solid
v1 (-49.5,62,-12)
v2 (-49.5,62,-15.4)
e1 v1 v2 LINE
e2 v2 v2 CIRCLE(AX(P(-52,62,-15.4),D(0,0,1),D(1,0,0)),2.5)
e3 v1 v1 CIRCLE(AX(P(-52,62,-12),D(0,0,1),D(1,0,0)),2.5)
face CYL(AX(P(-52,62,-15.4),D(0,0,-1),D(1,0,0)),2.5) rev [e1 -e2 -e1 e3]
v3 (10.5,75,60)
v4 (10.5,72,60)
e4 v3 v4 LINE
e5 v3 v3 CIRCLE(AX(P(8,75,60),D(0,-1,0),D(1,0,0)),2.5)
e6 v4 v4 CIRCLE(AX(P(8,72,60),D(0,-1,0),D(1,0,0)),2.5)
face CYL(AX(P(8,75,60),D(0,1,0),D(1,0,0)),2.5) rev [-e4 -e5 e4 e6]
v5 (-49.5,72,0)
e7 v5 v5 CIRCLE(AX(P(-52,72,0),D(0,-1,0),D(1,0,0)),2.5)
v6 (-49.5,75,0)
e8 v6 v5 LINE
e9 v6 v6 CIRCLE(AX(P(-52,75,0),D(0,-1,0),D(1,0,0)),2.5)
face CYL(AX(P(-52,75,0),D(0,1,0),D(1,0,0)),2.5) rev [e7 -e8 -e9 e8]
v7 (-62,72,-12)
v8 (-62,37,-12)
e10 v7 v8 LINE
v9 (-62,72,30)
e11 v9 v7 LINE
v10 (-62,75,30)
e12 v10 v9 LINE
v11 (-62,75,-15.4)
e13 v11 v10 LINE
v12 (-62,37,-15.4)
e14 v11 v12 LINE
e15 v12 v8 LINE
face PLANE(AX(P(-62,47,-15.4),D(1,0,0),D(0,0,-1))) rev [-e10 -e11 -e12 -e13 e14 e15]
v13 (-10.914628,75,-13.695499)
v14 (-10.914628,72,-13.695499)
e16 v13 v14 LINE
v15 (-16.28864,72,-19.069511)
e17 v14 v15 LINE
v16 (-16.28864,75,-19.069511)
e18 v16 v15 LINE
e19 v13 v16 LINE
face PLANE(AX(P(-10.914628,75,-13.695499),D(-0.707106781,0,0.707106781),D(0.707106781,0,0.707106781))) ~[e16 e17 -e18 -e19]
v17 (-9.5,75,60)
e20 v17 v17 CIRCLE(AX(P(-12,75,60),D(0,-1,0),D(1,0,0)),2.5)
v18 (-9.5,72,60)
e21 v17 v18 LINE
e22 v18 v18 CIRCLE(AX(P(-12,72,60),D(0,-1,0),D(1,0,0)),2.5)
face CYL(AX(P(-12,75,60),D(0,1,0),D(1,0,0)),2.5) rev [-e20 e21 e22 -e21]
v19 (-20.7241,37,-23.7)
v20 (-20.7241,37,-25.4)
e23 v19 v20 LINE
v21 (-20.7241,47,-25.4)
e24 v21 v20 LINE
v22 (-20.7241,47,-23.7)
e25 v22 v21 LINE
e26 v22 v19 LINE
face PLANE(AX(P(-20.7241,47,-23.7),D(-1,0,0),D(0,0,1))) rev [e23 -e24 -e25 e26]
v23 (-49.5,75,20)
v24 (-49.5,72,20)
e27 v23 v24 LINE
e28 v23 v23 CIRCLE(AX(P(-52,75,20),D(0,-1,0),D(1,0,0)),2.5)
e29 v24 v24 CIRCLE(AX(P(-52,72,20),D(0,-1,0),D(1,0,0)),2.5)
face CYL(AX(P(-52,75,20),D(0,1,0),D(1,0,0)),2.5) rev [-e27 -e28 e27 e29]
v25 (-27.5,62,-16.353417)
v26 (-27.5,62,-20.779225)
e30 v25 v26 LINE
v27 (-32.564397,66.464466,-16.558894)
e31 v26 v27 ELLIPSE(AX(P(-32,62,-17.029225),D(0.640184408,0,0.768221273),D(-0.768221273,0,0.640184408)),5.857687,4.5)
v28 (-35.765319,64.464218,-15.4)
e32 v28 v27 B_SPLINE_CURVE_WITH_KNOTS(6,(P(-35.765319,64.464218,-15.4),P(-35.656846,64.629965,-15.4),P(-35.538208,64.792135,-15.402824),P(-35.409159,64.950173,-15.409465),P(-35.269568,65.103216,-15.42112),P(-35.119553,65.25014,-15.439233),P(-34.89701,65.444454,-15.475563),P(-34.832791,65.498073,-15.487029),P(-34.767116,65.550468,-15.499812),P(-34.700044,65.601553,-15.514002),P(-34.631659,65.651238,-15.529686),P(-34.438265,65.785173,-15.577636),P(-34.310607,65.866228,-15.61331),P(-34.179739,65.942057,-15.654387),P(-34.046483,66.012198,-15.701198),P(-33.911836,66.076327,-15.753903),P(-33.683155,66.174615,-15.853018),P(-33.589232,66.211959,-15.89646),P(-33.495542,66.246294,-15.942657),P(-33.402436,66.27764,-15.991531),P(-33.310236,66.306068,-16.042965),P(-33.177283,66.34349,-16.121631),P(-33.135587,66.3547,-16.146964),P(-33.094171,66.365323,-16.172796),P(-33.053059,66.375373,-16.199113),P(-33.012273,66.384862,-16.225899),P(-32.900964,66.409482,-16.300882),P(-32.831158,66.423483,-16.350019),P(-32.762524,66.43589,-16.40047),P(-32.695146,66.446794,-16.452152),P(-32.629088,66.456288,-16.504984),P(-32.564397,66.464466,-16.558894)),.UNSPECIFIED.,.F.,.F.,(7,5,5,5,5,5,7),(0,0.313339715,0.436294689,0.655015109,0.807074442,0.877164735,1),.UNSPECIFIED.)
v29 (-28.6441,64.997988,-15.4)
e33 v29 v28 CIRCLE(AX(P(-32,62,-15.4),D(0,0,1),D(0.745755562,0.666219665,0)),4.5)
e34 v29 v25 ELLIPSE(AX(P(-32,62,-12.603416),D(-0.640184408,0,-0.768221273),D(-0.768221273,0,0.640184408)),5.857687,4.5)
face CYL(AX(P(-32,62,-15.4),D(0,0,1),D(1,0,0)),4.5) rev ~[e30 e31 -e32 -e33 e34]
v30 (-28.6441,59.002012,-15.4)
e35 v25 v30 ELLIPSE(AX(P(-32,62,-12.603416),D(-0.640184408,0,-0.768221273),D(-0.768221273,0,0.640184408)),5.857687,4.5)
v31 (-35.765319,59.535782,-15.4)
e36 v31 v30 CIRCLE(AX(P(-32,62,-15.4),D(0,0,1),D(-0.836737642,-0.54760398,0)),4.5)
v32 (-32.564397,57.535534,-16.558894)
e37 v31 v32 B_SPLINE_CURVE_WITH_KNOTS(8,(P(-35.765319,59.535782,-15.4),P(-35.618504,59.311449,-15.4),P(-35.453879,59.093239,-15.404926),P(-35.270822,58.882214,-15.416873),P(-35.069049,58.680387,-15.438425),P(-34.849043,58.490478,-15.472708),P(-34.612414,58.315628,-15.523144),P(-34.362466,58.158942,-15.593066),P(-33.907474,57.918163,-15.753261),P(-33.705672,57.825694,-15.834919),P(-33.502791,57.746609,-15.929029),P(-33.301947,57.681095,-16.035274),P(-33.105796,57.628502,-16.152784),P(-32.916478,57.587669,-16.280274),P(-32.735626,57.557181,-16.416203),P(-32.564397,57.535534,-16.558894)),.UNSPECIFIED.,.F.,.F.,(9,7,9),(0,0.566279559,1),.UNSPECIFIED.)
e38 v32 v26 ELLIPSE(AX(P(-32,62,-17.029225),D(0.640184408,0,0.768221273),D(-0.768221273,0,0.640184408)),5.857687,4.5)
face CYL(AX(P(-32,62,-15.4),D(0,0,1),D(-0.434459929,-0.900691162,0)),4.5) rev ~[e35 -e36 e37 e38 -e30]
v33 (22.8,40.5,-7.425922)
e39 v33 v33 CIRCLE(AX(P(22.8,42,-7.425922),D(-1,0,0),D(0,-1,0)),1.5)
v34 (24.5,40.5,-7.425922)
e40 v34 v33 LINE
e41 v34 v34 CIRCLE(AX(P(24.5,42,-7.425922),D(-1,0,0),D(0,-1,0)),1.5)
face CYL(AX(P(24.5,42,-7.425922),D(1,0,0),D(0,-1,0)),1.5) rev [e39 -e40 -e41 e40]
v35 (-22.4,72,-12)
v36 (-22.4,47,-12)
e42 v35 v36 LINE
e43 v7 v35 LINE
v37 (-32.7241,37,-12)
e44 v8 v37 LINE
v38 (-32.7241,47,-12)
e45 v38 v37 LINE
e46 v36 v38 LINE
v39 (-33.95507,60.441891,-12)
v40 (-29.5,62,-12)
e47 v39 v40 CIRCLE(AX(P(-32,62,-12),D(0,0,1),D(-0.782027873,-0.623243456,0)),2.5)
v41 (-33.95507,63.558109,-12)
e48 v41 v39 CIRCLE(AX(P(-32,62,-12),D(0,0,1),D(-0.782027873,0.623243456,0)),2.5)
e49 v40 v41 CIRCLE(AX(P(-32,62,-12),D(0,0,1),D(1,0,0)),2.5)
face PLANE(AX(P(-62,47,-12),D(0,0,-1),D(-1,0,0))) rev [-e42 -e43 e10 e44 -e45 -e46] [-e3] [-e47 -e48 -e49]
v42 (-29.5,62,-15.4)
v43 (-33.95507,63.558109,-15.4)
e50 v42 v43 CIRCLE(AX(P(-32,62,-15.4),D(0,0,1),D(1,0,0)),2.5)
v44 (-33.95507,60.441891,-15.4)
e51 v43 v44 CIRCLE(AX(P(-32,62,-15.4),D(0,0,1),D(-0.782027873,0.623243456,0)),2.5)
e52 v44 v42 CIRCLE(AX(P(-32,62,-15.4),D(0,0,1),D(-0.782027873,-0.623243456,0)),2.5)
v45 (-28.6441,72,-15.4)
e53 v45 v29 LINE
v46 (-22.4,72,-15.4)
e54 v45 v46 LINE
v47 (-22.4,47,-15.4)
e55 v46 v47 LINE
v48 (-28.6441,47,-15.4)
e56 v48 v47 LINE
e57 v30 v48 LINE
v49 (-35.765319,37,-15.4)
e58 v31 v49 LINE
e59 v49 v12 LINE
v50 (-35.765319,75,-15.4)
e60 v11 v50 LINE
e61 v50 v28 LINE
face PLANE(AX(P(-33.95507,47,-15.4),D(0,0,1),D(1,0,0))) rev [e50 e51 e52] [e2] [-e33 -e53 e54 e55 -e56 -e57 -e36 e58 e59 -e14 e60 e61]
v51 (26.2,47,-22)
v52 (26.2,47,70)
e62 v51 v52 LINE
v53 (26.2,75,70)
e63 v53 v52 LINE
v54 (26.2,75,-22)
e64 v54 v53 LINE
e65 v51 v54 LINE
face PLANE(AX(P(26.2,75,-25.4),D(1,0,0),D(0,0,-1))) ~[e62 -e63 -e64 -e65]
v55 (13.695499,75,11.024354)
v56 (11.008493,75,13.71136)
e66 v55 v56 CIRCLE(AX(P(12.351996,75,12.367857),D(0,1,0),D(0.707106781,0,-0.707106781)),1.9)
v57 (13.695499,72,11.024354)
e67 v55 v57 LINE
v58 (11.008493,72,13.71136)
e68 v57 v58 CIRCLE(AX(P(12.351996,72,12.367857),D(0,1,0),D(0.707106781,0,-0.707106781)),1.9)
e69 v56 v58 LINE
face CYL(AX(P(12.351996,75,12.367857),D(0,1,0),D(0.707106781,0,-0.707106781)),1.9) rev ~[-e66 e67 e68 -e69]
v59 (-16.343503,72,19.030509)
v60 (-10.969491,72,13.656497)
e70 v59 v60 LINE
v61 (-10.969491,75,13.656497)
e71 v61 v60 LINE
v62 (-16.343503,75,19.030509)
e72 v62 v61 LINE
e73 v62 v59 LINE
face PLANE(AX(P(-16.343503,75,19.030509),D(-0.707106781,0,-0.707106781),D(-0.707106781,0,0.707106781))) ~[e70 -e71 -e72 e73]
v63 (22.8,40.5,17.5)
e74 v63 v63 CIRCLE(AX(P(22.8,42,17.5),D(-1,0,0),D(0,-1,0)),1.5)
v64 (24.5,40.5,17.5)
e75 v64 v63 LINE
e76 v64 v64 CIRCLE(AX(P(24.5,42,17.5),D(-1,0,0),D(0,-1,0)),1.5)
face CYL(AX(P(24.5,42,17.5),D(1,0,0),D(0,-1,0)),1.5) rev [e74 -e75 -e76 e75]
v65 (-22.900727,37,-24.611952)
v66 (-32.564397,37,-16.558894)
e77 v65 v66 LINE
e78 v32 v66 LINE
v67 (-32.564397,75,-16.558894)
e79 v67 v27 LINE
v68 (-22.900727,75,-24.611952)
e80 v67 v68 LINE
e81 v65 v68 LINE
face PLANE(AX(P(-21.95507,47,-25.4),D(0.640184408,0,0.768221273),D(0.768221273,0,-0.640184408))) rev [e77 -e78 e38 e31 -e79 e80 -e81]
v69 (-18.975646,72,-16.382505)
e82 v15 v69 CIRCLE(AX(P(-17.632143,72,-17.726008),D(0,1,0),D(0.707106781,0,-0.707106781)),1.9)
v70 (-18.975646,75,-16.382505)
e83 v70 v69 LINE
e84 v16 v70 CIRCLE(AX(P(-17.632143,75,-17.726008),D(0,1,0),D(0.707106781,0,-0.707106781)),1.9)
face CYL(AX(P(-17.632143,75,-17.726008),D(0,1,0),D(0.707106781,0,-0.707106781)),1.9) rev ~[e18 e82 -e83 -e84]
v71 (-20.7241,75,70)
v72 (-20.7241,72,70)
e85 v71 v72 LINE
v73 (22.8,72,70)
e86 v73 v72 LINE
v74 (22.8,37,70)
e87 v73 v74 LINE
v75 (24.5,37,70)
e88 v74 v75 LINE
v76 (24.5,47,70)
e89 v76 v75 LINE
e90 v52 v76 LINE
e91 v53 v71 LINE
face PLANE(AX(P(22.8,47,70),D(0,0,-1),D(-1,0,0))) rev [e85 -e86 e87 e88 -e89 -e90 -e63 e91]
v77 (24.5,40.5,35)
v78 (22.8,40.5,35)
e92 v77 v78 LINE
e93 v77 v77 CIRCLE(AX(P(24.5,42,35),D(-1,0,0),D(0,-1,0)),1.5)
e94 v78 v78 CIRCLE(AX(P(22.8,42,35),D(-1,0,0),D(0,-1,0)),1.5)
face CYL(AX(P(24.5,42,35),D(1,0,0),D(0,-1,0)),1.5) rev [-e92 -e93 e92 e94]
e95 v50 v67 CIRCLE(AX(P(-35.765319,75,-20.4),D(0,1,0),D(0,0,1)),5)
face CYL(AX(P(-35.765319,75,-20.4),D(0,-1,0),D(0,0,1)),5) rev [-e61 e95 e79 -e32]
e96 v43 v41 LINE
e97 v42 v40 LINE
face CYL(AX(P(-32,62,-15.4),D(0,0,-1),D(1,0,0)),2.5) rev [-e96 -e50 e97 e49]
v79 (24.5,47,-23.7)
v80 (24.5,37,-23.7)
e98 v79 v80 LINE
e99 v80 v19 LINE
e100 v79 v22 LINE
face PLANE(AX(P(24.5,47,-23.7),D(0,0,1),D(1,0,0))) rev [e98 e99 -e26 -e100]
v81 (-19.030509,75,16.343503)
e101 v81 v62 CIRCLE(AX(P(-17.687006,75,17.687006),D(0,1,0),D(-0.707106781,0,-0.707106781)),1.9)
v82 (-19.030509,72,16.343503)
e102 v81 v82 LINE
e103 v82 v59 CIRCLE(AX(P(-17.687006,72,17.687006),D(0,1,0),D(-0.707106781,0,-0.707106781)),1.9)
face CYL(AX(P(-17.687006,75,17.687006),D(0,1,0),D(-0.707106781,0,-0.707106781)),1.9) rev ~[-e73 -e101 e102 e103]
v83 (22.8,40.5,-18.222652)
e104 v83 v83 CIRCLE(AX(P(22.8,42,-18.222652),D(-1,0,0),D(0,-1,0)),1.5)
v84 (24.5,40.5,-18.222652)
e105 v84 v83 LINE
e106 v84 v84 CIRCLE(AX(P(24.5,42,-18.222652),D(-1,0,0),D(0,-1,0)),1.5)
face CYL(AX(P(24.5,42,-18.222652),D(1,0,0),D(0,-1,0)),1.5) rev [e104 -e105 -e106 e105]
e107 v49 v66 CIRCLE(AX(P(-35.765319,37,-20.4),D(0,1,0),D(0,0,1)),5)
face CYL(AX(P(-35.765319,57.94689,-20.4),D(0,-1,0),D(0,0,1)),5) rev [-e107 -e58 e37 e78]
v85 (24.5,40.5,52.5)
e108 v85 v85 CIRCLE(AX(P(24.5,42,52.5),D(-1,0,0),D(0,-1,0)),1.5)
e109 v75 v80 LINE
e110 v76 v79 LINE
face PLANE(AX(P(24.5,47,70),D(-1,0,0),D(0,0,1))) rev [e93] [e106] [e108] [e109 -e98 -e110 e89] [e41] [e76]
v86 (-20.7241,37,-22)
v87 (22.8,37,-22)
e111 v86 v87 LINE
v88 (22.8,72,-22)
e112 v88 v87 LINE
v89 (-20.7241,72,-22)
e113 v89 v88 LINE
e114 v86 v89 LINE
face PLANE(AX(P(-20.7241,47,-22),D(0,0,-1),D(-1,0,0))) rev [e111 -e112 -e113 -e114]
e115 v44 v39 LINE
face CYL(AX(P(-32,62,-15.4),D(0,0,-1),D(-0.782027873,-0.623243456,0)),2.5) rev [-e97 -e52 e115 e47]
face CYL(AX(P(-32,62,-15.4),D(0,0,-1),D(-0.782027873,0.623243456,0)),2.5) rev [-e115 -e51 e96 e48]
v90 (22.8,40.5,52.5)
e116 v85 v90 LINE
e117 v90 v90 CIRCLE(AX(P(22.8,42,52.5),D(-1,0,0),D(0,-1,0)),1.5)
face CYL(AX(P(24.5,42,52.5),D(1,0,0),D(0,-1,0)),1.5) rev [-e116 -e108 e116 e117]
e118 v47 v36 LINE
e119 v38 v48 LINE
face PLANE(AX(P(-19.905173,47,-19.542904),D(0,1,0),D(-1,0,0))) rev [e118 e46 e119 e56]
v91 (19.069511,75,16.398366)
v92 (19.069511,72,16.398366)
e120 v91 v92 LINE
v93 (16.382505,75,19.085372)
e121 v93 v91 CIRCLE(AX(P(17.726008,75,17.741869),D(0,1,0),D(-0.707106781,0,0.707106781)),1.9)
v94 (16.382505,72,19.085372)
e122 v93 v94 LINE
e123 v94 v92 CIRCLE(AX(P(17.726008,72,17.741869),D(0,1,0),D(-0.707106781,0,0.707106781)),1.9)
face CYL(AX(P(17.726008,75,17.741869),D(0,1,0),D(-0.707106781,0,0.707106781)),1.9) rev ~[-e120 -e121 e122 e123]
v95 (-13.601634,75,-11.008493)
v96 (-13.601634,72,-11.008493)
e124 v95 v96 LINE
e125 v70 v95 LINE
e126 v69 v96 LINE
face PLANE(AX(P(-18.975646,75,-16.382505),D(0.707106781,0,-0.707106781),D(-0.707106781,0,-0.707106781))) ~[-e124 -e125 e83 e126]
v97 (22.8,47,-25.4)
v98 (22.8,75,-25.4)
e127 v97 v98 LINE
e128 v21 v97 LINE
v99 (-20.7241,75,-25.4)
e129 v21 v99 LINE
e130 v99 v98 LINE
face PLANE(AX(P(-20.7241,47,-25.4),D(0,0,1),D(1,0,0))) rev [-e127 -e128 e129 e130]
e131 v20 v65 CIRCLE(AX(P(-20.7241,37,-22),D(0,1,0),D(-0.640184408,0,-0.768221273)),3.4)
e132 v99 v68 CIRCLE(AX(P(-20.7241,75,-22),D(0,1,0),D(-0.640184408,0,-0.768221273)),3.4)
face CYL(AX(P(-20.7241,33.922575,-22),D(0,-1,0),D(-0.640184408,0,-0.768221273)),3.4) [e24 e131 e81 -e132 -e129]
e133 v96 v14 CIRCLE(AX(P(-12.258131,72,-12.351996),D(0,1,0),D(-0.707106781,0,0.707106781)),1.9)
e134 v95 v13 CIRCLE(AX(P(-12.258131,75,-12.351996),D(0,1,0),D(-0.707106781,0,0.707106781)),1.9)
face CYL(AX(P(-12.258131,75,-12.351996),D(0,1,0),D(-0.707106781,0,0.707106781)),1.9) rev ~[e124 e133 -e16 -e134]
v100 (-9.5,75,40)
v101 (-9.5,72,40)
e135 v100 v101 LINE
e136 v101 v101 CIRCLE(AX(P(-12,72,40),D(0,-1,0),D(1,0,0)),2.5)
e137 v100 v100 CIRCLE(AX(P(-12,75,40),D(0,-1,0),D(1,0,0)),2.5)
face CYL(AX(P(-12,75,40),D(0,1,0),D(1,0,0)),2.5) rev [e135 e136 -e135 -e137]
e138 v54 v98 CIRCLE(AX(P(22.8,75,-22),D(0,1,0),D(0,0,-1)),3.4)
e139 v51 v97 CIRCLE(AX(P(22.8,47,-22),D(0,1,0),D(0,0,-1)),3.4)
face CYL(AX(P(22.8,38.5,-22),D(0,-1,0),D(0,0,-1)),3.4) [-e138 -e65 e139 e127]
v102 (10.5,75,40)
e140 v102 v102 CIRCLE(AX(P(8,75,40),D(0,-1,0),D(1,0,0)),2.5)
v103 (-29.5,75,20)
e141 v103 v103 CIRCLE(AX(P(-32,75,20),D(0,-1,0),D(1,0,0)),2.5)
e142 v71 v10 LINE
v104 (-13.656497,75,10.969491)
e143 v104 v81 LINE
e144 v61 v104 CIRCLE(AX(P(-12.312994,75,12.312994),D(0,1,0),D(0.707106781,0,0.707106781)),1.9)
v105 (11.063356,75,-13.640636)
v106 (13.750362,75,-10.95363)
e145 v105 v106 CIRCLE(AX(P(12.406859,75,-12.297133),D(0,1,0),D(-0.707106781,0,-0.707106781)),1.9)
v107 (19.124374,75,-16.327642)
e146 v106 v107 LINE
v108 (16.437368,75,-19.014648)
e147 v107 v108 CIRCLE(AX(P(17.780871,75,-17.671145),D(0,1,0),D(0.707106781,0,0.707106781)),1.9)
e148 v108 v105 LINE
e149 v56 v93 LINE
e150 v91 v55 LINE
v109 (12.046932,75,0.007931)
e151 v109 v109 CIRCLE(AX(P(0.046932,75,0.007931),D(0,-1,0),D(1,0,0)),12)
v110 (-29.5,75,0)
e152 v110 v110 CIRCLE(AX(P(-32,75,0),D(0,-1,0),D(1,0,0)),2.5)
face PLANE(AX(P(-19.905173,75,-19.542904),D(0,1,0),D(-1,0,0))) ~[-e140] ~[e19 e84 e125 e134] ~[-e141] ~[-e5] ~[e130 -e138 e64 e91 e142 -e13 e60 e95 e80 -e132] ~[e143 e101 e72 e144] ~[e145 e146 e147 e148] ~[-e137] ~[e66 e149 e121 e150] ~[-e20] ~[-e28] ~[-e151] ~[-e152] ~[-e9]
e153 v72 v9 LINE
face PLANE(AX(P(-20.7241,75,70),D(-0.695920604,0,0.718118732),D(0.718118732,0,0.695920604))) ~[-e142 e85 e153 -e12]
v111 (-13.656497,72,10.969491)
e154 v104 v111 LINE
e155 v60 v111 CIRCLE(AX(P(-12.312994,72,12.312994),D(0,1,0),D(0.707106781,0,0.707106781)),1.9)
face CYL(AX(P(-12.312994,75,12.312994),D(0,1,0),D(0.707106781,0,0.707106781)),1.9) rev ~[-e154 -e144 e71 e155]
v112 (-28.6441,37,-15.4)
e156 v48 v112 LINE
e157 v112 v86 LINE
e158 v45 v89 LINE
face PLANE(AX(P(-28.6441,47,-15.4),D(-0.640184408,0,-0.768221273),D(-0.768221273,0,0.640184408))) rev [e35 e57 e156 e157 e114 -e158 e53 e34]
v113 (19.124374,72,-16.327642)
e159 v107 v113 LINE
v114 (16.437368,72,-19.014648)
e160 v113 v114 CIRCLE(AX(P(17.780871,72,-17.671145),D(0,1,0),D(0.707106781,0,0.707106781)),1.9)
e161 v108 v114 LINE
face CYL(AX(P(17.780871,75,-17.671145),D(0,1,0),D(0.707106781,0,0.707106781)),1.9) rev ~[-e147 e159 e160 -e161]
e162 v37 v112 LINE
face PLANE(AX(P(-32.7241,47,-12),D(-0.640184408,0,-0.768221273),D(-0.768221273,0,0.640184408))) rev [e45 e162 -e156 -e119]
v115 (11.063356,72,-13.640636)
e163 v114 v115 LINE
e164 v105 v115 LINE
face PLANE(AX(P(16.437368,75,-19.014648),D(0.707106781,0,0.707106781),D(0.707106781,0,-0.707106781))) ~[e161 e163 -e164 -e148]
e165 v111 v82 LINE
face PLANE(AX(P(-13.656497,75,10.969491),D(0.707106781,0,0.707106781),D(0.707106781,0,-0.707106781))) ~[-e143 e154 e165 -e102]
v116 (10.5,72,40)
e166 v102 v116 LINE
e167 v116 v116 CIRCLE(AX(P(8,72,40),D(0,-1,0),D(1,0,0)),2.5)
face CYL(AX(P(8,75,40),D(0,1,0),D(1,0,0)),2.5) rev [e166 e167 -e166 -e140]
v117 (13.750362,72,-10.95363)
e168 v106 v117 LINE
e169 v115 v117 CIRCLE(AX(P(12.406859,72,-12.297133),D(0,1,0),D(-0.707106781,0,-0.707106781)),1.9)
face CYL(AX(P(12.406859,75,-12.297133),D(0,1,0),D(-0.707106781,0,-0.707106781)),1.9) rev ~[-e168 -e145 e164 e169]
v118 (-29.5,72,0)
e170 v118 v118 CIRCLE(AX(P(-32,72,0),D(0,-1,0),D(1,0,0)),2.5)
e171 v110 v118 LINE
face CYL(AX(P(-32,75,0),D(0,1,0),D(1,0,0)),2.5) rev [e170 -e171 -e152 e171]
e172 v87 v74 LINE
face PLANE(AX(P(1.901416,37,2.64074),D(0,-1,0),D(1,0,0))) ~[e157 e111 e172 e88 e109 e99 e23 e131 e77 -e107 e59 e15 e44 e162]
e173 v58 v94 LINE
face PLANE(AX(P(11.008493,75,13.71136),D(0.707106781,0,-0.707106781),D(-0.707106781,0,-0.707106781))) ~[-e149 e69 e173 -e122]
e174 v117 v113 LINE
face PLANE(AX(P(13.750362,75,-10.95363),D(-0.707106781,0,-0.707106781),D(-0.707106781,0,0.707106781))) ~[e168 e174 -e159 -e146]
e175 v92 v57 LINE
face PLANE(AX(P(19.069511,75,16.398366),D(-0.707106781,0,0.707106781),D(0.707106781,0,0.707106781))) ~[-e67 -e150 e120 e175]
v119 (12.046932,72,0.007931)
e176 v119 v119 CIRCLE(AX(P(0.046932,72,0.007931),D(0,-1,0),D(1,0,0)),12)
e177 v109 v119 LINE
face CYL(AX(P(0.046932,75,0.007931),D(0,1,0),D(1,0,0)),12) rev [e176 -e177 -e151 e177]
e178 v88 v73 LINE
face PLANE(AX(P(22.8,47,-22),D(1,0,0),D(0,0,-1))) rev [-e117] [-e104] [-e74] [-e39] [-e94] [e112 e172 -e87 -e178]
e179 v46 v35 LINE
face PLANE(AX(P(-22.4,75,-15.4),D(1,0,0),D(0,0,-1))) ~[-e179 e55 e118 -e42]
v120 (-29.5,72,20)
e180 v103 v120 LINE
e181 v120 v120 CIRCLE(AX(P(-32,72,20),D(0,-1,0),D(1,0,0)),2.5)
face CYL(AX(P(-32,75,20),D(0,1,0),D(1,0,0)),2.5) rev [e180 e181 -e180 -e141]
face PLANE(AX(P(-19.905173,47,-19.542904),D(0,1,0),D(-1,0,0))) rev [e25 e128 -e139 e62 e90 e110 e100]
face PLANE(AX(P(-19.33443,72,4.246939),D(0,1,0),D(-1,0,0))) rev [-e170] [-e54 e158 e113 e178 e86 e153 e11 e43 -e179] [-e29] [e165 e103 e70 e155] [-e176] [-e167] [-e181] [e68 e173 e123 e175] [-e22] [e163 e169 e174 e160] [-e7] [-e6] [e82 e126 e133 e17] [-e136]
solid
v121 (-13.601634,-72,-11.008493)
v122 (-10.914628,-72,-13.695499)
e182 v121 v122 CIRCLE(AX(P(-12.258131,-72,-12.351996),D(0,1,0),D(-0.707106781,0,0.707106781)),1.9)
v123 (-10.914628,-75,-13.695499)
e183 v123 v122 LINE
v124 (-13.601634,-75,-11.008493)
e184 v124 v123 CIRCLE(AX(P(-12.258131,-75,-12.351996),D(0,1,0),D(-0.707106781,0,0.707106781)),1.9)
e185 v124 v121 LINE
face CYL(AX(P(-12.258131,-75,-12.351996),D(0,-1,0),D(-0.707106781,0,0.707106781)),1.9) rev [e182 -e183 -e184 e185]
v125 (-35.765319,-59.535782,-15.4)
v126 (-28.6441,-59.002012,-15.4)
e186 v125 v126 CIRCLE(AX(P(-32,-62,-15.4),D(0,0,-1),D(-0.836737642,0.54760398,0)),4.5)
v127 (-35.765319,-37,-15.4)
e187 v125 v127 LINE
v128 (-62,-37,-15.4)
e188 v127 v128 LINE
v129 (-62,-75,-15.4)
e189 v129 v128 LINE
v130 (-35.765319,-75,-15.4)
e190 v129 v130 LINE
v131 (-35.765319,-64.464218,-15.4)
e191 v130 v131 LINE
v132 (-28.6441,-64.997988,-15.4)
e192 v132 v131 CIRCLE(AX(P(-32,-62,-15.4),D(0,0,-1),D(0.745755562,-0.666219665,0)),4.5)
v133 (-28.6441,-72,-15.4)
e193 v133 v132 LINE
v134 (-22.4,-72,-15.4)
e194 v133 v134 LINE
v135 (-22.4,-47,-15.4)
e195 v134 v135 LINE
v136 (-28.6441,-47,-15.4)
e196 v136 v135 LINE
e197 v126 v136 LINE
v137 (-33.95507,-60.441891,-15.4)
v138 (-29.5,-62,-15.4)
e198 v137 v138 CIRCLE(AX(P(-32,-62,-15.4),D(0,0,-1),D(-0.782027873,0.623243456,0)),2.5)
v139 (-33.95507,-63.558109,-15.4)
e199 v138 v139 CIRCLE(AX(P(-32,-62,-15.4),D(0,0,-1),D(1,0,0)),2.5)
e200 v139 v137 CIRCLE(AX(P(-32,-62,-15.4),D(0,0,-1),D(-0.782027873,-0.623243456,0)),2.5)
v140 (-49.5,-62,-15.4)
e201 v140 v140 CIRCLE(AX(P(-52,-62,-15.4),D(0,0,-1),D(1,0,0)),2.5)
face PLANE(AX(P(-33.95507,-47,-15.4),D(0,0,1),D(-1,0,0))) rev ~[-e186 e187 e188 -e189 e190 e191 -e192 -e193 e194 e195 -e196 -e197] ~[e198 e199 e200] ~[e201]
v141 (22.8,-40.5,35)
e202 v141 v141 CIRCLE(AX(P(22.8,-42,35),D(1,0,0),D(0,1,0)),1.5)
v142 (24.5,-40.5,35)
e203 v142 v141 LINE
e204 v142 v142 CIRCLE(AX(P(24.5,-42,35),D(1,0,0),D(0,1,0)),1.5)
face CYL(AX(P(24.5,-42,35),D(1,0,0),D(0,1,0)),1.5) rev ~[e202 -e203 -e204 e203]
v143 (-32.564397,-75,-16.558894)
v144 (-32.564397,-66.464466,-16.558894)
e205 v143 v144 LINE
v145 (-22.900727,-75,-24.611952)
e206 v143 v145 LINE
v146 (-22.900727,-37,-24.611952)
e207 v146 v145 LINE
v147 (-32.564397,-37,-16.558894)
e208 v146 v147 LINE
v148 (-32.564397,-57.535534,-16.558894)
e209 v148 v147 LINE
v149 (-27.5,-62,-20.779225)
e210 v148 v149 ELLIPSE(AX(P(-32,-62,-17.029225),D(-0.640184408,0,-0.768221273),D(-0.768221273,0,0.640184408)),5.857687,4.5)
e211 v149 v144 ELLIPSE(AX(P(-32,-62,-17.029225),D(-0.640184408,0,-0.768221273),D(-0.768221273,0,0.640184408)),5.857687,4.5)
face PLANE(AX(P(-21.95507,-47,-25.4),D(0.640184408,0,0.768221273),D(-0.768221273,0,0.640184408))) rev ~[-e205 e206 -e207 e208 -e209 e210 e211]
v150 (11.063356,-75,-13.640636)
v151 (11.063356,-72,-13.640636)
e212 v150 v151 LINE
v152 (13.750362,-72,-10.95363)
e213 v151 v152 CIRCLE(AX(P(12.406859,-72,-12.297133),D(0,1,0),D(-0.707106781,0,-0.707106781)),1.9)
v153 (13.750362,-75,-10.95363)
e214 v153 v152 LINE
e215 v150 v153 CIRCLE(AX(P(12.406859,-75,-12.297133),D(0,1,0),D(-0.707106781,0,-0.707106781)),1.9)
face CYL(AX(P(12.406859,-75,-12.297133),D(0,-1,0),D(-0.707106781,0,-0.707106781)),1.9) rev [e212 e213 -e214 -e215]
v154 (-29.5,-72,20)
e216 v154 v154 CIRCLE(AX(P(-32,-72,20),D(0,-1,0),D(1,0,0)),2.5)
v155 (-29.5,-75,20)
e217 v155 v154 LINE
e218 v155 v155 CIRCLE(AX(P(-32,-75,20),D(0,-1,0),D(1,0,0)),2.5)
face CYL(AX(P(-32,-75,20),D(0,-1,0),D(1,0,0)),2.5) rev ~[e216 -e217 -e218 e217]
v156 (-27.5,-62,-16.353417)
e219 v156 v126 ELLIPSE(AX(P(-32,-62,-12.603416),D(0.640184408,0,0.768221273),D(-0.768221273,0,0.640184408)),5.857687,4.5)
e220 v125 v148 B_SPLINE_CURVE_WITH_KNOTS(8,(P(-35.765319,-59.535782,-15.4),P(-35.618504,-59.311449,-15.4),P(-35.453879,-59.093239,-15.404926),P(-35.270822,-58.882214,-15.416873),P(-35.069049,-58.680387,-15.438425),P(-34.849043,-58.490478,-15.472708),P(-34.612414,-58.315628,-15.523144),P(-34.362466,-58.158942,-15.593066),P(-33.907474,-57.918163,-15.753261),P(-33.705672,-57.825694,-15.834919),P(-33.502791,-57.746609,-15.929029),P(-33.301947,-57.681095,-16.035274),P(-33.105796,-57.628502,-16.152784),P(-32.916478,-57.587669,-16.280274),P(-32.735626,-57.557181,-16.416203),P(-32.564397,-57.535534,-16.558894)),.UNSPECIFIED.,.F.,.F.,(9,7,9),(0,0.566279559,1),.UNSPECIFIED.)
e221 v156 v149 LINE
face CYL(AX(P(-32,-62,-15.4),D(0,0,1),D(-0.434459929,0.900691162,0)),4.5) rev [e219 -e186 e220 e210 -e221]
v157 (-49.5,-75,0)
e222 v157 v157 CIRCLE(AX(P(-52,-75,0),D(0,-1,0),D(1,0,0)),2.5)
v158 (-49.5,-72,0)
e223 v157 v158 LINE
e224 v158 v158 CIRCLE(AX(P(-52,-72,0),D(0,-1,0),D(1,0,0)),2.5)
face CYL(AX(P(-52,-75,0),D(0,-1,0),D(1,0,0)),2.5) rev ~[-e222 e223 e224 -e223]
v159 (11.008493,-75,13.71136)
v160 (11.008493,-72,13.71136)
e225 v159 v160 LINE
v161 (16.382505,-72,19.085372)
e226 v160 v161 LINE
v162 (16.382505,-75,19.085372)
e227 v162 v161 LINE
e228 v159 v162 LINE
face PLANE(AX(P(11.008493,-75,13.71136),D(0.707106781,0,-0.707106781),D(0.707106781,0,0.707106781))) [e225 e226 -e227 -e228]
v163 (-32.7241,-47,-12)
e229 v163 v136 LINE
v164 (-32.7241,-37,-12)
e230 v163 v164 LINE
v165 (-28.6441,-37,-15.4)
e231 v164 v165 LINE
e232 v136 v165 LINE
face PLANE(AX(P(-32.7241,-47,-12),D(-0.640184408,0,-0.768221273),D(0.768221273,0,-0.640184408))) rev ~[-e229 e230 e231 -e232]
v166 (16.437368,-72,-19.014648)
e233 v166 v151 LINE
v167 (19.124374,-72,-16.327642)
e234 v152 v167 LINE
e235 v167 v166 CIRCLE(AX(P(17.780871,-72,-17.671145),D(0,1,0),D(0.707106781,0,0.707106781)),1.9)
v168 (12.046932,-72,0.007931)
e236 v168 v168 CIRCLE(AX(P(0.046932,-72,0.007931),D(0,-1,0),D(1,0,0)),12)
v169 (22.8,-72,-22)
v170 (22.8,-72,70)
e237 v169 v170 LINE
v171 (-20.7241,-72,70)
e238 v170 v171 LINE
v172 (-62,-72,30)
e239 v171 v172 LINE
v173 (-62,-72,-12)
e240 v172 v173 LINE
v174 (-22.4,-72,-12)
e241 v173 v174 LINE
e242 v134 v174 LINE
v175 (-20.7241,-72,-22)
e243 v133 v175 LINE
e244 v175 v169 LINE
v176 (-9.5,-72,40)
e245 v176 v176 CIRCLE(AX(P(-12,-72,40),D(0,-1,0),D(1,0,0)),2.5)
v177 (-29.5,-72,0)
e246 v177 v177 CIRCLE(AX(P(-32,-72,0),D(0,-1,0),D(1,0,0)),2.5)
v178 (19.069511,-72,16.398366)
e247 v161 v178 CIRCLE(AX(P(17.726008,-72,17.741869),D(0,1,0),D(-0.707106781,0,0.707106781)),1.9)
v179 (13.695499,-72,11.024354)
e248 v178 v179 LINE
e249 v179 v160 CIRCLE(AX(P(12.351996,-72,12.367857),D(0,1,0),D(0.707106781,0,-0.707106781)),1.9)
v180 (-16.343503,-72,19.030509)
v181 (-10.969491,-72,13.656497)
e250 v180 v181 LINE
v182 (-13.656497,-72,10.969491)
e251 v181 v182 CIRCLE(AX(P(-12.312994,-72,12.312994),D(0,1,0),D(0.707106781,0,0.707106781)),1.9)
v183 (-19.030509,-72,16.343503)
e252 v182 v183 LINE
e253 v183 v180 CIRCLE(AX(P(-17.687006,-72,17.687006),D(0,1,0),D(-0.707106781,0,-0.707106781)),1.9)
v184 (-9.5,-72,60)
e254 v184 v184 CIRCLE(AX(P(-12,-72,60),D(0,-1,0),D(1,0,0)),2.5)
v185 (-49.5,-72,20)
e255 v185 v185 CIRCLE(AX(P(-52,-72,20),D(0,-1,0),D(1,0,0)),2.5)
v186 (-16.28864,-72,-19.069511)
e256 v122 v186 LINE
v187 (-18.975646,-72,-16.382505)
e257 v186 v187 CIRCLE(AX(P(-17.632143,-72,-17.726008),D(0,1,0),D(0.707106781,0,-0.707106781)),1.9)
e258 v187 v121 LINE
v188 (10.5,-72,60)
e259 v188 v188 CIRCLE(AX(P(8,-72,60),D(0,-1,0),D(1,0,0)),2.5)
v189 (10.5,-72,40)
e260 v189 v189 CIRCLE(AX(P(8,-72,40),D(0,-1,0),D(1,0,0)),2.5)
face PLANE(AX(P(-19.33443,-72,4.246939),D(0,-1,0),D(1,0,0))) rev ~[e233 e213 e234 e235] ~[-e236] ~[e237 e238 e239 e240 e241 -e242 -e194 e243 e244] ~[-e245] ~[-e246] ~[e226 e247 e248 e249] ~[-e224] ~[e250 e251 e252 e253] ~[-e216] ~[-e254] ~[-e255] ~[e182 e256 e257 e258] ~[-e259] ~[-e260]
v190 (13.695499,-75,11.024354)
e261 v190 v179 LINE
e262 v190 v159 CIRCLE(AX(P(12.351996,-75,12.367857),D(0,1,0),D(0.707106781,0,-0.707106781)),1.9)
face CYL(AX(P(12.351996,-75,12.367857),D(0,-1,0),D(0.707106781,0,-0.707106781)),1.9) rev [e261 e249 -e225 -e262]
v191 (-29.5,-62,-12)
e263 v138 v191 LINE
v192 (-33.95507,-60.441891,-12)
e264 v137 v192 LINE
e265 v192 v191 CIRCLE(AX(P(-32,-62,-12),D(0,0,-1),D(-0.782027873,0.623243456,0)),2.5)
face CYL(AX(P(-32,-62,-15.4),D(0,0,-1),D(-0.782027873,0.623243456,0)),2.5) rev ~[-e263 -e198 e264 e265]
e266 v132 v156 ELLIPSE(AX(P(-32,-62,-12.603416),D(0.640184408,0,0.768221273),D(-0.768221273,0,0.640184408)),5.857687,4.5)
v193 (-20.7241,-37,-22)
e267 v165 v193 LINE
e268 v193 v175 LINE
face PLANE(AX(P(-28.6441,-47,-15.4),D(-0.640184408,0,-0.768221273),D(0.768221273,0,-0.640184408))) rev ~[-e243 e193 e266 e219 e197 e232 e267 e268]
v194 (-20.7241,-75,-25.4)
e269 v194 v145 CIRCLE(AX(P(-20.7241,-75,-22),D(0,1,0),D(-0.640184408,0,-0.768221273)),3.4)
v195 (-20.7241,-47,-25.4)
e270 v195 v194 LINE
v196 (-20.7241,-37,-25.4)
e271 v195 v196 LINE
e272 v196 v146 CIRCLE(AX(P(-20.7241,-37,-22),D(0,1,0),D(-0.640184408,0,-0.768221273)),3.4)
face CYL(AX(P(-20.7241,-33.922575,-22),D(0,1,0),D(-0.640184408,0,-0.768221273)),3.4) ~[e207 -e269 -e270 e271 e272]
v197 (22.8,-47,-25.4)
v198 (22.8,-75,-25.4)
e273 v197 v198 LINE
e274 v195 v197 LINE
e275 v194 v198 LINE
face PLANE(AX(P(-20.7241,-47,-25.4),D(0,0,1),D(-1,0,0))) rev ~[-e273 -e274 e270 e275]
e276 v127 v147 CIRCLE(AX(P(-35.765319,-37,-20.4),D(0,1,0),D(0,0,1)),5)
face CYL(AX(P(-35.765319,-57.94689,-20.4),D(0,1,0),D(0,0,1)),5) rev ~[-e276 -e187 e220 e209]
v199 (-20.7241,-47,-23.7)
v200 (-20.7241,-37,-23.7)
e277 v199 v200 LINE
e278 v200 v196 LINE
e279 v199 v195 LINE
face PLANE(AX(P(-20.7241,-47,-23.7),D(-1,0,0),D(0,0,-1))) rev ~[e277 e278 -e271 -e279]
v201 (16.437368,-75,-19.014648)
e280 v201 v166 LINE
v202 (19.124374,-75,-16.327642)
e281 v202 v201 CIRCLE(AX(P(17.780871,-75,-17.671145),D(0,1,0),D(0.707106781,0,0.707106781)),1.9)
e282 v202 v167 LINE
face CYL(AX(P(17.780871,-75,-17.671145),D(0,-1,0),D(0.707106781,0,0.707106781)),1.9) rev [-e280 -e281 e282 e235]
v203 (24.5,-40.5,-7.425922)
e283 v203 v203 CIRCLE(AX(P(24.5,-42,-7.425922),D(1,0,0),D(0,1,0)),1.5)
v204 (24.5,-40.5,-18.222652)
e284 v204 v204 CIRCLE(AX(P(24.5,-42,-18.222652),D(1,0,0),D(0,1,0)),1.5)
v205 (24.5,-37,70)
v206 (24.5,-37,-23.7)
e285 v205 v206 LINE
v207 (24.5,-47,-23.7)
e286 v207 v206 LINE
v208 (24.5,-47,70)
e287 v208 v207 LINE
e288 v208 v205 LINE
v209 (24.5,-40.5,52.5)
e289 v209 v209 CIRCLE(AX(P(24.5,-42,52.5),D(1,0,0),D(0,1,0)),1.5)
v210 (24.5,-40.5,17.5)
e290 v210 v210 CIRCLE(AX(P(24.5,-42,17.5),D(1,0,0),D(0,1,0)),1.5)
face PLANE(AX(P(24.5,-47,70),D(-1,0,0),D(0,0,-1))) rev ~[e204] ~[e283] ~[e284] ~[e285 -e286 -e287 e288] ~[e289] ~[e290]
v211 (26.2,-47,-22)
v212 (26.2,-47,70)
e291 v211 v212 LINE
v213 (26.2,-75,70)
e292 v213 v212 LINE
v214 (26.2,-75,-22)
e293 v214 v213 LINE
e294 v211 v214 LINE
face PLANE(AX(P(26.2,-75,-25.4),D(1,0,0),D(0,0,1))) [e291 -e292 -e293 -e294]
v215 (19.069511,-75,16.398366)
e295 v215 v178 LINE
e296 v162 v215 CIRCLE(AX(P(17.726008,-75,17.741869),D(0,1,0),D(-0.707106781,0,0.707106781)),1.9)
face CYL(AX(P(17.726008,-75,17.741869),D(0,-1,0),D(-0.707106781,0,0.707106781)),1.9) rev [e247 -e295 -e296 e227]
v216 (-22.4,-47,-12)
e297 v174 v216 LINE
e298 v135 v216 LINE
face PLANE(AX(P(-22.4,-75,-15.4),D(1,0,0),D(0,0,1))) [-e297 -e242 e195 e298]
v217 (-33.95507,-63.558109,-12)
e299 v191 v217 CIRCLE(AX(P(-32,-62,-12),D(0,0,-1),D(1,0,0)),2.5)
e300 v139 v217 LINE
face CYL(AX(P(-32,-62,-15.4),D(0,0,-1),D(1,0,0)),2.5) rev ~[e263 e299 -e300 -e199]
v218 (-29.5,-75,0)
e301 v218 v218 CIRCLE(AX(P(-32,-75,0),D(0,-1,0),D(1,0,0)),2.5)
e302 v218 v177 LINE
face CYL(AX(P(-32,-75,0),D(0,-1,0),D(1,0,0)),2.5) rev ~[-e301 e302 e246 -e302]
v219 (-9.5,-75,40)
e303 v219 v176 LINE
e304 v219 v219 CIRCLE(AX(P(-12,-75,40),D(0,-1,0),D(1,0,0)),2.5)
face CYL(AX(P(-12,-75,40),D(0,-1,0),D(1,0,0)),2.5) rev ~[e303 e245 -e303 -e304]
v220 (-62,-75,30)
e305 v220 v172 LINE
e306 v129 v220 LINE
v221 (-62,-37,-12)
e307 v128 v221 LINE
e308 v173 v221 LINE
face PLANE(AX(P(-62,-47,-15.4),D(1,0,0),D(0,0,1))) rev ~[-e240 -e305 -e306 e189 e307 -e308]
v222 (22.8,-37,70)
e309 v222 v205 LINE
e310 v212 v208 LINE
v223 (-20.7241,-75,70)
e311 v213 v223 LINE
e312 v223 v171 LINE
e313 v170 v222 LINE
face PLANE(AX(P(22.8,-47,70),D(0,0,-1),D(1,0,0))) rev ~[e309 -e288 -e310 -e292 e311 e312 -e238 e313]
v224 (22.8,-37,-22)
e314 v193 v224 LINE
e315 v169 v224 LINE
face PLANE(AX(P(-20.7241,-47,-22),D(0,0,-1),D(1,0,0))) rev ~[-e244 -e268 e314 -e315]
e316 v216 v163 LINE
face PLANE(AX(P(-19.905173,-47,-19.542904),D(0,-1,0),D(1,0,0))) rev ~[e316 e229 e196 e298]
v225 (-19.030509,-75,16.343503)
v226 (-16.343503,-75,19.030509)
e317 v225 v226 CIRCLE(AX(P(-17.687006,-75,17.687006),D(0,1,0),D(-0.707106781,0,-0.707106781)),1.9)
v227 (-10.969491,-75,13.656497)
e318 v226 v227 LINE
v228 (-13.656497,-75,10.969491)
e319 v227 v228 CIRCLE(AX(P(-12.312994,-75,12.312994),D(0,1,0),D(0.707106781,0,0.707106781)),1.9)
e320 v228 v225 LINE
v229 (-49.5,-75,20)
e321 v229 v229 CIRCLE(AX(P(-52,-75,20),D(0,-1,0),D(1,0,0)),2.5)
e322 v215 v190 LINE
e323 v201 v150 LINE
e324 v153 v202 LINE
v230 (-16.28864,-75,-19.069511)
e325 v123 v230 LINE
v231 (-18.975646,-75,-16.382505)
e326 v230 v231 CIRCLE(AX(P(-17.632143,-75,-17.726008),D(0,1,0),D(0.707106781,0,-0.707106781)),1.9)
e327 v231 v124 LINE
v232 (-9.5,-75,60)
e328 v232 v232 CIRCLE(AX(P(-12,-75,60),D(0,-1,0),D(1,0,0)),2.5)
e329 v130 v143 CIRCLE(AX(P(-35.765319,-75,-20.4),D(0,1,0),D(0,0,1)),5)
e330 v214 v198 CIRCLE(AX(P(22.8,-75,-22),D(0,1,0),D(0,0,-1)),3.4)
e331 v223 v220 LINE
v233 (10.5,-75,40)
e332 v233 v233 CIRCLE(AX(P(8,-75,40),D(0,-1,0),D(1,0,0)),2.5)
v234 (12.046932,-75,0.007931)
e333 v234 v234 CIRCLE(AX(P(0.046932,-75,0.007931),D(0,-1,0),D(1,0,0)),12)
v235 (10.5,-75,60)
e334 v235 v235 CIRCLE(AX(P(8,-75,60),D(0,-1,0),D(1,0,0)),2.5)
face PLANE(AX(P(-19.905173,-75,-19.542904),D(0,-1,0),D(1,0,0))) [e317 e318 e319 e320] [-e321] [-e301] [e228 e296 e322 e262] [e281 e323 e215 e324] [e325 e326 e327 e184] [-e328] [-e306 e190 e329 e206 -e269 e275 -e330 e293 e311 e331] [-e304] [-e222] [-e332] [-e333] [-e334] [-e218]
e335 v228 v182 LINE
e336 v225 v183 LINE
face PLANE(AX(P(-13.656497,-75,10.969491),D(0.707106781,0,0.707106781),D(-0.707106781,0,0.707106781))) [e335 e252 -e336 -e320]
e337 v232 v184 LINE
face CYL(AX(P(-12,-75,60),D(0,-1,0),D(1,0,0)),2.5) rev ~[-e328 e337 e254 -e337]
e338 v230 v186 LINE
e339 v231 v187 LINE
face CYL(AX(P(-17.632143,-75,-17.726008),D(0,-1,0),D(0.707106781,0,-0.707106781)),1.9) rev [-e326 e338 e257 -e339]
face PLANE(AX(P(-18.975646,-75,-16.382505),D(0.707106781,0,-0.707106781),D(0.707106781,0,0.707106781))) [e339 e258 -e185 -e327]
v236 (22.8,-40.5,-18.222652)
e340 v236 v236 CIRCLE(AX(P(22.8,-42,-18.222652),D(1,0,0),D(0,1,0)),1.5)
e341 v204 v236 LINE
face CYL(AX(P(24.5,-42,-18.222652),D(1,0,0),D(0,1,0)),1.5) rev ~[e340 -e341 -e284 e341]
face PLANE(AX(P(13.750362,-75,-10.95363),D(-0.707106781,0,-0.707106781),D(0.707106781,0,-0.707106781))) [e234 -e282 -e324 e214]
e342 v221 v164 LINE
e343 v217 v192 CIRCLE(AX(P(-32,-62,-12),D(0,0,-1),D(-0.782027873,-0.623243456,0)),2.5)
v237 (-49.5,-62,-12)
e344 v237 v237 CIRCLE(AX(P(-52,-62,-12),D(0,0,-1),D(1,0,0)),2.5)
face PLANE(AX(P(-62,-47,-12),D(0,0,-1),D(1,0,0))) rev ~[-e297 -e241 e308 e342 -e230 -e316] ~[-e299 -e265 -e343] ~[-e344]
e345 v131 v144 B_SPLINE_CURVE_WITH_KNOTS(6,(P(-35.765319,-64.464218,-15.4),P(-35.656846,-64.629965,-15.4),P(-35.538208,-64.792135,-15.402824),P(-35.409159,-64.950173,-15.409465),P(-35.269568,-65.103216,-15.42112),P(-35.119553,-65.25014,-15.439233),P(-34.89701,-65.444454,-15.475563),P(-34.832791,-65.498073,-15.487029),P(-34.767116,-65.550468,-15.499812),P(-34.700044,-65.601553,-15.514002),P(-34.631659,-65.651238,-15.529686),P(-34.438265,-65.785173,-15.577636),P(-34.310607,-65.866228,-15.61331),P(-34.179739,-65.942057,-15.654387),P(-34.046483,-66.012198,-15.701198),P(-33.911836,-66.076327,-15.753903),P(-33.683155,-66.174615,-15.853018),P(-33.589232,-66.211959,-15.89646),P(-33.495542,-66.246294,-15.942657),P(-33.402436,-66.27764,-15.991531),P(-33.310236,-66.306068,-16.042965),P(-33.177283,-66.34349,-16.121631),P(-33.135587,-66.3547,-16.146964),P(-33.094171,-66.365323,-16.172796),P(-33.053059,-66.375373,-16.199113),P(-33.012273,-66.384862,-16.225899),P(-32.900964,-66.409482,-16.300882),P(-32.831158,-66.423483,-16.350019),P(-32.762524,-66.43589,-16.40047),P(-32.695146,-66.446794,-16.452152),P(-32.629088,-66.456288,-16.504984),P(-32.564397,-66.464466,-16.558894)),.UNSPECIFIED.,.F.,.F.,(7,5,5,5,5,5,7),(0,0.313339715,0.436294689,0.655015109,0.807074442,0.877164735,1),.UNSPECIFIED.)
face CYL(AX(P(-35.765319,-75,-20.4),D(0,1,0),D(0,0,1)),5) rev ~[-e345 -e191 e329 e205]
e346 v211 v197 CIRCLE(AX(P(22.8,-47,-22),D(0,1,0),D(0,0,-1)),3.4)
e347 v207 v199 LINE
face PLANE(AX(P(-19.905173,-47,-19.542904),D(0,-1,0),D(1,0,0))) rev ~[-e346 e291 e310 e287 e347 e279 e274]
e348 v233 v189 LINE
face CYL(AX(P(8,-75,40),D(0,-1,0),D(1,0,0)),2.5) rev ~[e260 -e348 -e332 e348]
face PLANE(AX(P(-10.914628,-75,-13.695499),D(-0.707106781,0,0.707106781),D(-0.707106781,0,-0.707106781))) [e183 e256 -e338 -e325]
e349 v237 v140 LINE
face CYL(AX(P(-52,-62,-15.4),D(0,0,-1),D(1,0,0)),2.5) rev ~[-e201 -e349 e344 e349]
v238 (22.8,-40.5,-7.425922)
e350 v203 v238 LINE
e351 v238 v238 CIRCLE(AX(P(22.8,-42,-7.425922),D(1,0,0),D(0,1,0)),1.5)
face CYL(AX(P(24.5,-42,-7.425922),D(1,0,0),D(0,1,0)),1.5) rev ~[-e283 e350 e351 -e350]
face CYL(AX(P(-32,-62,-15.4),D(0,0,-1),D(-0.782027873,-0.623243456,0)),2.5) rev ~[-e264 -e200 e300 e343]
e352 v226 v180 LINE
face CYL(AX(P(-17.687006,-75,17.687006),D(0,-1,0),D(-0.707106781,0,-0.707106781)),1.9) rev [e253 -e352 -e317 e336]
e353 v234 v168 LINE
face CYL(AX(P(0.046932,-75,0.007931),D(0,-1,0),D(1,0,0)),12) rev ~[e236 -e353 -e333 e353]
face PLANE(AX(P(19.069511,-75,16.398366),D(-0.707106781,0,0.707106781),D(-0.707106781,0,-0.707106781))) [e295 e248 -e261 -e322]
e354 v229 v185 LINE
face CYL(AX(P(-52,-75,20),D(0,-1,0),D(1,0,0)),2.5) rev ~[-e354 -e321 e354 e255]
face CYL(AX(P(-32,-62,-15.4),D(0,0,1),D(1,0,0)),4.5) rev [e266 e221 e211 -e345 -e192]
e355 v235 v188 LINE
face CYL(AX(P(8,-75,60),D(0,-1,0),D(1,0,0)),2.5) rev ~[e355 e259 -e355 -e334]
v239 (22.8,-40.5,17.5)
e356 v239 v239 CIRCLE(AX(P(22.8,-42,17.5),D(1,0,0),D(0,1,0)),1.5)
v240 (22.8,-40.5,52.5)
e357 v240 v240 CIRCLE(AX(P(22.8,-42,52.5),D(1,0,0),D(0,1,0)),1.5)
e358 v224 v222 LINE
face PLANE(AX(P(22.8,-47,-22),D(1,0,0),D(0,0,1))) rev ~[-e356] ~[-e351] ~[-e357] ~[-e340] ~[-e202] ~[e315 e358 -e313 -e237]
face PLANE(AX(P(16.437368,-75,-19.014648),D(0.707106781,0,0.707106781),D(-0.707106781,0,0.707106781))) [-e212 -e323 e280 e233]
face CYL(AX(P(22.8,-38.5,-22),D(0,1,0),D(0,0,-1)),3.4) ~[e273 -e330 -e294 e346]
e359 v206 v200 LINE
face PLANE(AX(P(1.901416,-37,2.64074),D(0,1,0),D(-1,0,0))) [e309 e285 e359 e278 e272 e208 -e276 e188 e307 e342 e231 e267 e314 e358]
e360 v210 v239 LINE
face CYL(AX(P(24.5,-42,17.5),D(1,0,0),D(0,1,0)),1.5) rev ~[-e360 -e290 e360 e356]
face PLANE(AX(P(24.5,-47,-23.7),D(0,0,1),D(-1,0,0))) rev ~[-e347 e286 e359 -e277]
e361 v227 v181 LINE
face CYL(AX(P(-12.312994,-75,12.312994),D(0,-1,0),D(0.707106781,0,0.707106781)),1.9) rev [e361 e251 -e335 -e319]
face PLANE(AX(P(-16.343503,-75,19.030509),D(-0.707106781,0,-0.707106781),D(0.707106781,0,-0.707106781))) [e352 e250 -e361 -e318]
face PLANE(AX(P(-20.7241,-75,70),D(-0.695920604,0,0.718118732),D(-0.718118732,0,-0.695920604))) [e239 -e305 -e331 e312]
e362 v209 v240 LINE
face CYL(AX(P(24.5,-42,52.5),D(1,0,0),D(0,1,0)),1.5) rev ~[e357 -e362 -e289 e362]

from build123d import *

# Parameters (mm, degrees)
F3_R         = 2.5
F3_R_2       = 12
F5_DEPTH     = 3
F6_DEPTH     = 28
F7_R         = 2.5
F8_DEPTH     = 12.5
F9_DEPTH     = 207
F11_DEPTH    = 10
F12_R        = 1.5
F13_DEPTH    = 1.7
F14_T1_DEPTH = 44.1548490014
F14_T3_DEPTH = 45
F15_R        = 5


# Not quite as in the source:
# - a fillet or chamfer that OpenCascade refuses, or shapes differently, is made with other operations: its cross-section is extruded or revolved along the edge and cut away or added
# - an extrude ends at something that could not be found from the text; its depth is read off the source's solid


with BuildPart() as f5:
    # F3 (on offset) → F5 (new body)
    with BuildSketch(Plane.XZ.offset(75)):
        Polygon((22.8, -22), (22.8, 22), (-11.1900709997, 22), (-20.7240998825, 30.0000001192), (-31.9999998808, 30.0000001192), (-61.9999998808, 30.0000001192), (-61.9999998808, -9.9999998808), (-61.9999998808, -11.9999998808), (-32.7240997633, -11.9999998808), (-20.7240998825, -22), align=None)
        with Locations((-51.9999998808, 1.192e-07)):
            Circle(F3_R, mode=Mode.SUBTRACT)
        with Locations((-31.9999998808, 1.192e-07)):
            Circle(F3_R, mode=Mode.SUBTRACT)
        with Locations((-51.9999998808, 20.0000001192)):
            Circle(F3_R, mode=Mode.SUBTRACT)
        with Locations((-31.9999998808, 20.0000001192)):
            Circle(F3_R, mode=Mode.SUBTRACT)
        with BuildLine():
            Line((-10.9146282961, -13.6954990502), (-16.2886398331, -19.0695105872))
            ThreePointArc((-16.2886398331, -19.0695105872), (-18.9756456016, -19.0695105872), (-18.9756456016, -16.3825048187))
            Line((-18.9756456016, -16.3825048187), (-13.6016340646, -11.0084932817))
            ThreePointArc((-13.6016340646, -11.0084932817), (-10.9146282961, -11.0084932817), (-10.9146282961, -13.6954990502))
        make_face(mode=Mode.SUBTRACT)
        with Locations((0.0469324928, 0.0079305583)):
            Circle(F3_R_2, mode=Mode.SUBTRACT)
        with BuildLine():
            Line((13.7503621014, -10.9536302305), (19.1243736384, -16.3276417676))
            ThreePointArc((19.1243736384, -16.3276417676), (19.1243736384, -19.0146475361), (16.4373678699, -19.0146475361))
            Line((16.4373678699, -19.0146475361), (11.0633563329, -13.6406359991))
            ThreePointArc((11.0633563329, -13.6406359991), (11.0633563329, -10.9536302305), (13.7503621014, -10.9536302305))
        make_face(mode=Mode.SUBTRACT)
        with BuildLine():
            ThreePointArc((-10.9694913472, 13.6564971157), (-10.9694913472, 10.9694913472), (-13.6564971157, 10.9694913472))
            Line((-13.6564971157, 10.9694913472), (-19.0305086528, 16.3435028843))
            ThreePointArc((-19.0305086528, 16.3435028843), (-19.0305086528, 19.0305086528), (-16.3435028843, 19.0305086528))
            Line((-16.3435028843, 19.0305086528), (-10.9694913472, 13.6564971157))
        make_face(mode=Mode.SUBTRACT)
        with BuildLine():
            Line((11.0084932817, 13.7113601669), (16.3825048187, 19.0853717039))
            ThreePointArc((16.3825048187, 19.0853717039), (19.0695105872, 19.0853717039), (19.0695105872, 16.3983659354))
            Line((19.0695105872, 16.3983659354), (13.6954990502, 11.0243543984))
            ThreePointArc((13.6954990502, 11.0243543984), (11.0084932817, 11.0243543984), (11.0084932817, 13.7113601669))
        make_face(mode=Mode.SUBTRACT)
        Polygon((-11.1900709997, 22), (22.8, 22), (22.8, 70.0000001192), (-20.7240998825, 70.0000001192), (-61.9999998808, 30.0000001192), (-31.9999998808, 30.0000001192), (-20.7240998825, 30.0000001192), align=None)
        with Locations((-11.9999998808, 40.0000001192)):
            Circle(F3_R, mode=Mode.SUBTRACT)
        with Locations((8.0000001192, 40.0000001192)):
            Circle(F3_R, mode=Mode.SUBTRACT)
        with Locations((-11.9999998808, 60.0000001192)):
            Circle(F3_R, mode=Mode.SUBTRACT)
        with Locations((8.0000001192, 60.0000001192)):
            Circle(F3_R, mode=Mode.SUBTRACT)
    extrude(amount=-F5_DEPTH)

    # F4 (on offset) → F6 (join)
    with BuildSketch(Plane.XZ.offset(75)):
        Polygon((-32.7240997633, -11.9999998808), (-61.9999998808, -11.9999998808), (-61.9999998808, -15.3999998808), (-33.9550695636, -15.3999998808), (-21.9550696828, -25.4), (22.8, -25.4), (22.8, -22), (-20.7240998825, -22), (-28.6440998525, -15.3999998808), align=None)
        Polygon((-22.4, -11.9999998808), (-32.7240997633, -11.9999998808), (-28.6440998525, -15.3999998808), (-22.4, -15.3999998808), align=None)
        Polygon((22.8, 22), (22.8, -22), (22.8, -25.4), (26.2, -25.4), (26.2, 22), (26.2, 70.0000001192), (22.8, 70.0000001192), align=None)
    extrude(amount=-F6_DEPTH)

    # F7 (on face) → F8 (cut, symmetric)
    with BuildSketch(Plane(origin=(0, 0, -15.3999998808), x_dir=(1, 0, 0), z_dir=(0, 0, -1))):
        with BuildLine():
            Line((-33.9550695636, 60.4418913596), (-33.9550695636, 63.5581086404))
            ThreePointArc((-33.9550695636, 63.5581086404), (-34.4999998808, 62), (-33.9550695636, 60.4418913596))
        make_face()
        with BuildLine():
            ThreePointArc((-33.9550695636, 60.4418913596), (-31.1746739473, 59.6401616361), (-29.4999998808, 62))
            ThreePointArc((-29.4999998808, 62), (-31.1746739473, 64.3598383639), (-33.9550695636, 63.5581086404))
            Line((-33.9550695636, 63.5581086404), (-33.9550695636, 60.4418913596))
        make_face()
        with Locations((-51.9999998808, 62)):
            Circle(F7_R)
    extrude(amount=F8_DEPTH, both=True, mode=Mode.SUBTRACT)

    # F7 (on face) → F9 (cut, through all)
    with BuildSketch(Plane(origin=(0, 0, -15.3999998808), x_dir=(1, 0, 0), z_dir=(0, 0, -1))):
        with BuildLine():
            ThreePointArc((-33.9550695636, 60.4418913596), (-34.4999998808, 62), (-33.9550695636, 63.5581086404))
            Line((-33.9550695636, 63.5581086404), (-33.9550695636, 66.0531102299))
            ThreePointArc((-33.9550695636, 66.0531102299), (-36.4999998808, 62), (-33.9550695636, 57.9468897701))
            Line((-33.9550695636, 57.9468897701), (-33.9550695636, 60.4418913596))
        make_face()
        with BuildLine():
            ThreePointArc((-33.9550695636, 63.5581086404), (-31.1746739473, 64.3598383639), (-29.4999998808, 62))
            ThreePointArc((-29.4999998808, 62), (-31.1746739473, 59.6401616361), (-33.9550695636, 60.4418913596))
            Line((-33.9550695636, 60.4418913596), (-33.9550695636, 57.9468897701))
            ThreePointArc((-33.9550695636, 57.9468897701), (-29.6070742209, 58.1889756251), (-27.4999998808, 62))
            ThreePointArc((-27.4999998808, 62), (-29.6070742209, 65.8110243749), (-33.9550695636, 66.0531102299))
            Line((-33.9550695636, 66.0531102299), (-33.9550695636, 63.5581086404))
        make_face()
        with BuildLine():
            Line((-33.9550695636, 60.4418913596), (-33.9550695636, 63.5581086404))
            ThreePointArc((-33.9550695636, 63.5581086404), (-34.4999998808, 62), (-33.9550695636, 60.4418913596))
        make_face()
        with BuildLine():
            ThreePointArc((-33.9550695636, 60.4418913596), (-31.1746739473, 59.6401616361), (-29.4999998808, 62))
            ThreePointArc((-29.4999998808, 62), (-31.1746739473, 64.3598383639), (-33.9550695636, 63.5581086404))
            Line((-33.9550695636, 63.5581086404), (-33.9550695636, 60.4418913596))
        make_face()
    extrude(amount=F9_DEPTH, mode=Mode.SUBTRACT)

    # F10 (on face) → F11 (join)
    with BuildSketch(Plane(origin=(0, -47, 0), x_dir=(-1, 0, 0), z_dir=(0, 1, 0))):
        Polygon((20.7240998825, -22), (-22.8, -22), (-22.8, 70.0000001192), (-24.5, 70.0000001192), (-24.5, -23.7), (20.7240998825, -23.7), (20.7240998825, -25.4), (21.9550696828, -25.4), (33.9550695636, -15.3999998808), (61.9999998808, -15.3999998808), (61.9999998808, -11.9999998808), (32.7240997633, -11.9999998808), (28.6440998525, -15.3999998808), align=None)
    extrude(amount=F11_DEPTH)

    # F12 (on face) → F13 (cut, through all)
    with BuildSketch(Plane.YZ.offset(24.5)):
        with Locations((-42, -7.4259215035)):
            Circle(F12_R)
        with Locations((-42, -18.2226523757)):
            Circle(F12_R)
        with Locations((-42, 52.5000000894)):
            Circle(F12_R)
        with Locations((-42, 35.0000000596)):
            Circle(F12_R)
        with Locations((-42, 17.5000000298)):
            Circle(F12_R)
    extrude(amount=-F13_DEPTH, mode=Mode.SUBTRACT)

    # F14: fillet of radius 3.4 on 2 edges, made by hand

    # F14_s2 → F14_t1 (cut)
    with BuildSketch(Plane.XZ.offset(33.9225754993)):
        with BuildLine():
            ThreePointArc((-22.9007268695, -24.6119523272), (-21.8815457965, -25.1969233579), (-20.7240998825, -25.4))
            Line((-20.7240998825, -25.4), (-21.9550696828, -25.4))
            Line((-21.9550696828, -25.4), (-22.9007268695, -24.6119523272))
        make_face()
    extrude(amount=F14_T1_DEPTH, mode=Mode.SUBTRACT)

    # F14_s4 → F14_t3 (cut)
    with BuildSketch(Plane.XZ.offset(38.5)):
        with BuildLine():
            ThreePointArc((22.8, -25.4), (25.204163056, -24.404163056), (26.2, -22))
            Line((26.2, -22), (26.2, -25.4))
            Line((26.2, -25.4), (22.8, -25.4))
        make_face()
    extrude(amount=F14_T3_DEPTH, mode=Mode.SUBTRACT)

    # F15
    f15_edges = [f5.edges().sort_by_distance(p)[0] for p in [
        (-33.95507, -70.526555, -15.4),
        (-33.95507, -47.473445, -15.4),
    ]]
    fillet(f15_edges, radius=F15_R)


with BuildPart() as f16_1:
    # F16: instance of F5
    add(f5.part.mirror(Plane.XZ))


solid = Compound([f5.part, f16_1.part])
